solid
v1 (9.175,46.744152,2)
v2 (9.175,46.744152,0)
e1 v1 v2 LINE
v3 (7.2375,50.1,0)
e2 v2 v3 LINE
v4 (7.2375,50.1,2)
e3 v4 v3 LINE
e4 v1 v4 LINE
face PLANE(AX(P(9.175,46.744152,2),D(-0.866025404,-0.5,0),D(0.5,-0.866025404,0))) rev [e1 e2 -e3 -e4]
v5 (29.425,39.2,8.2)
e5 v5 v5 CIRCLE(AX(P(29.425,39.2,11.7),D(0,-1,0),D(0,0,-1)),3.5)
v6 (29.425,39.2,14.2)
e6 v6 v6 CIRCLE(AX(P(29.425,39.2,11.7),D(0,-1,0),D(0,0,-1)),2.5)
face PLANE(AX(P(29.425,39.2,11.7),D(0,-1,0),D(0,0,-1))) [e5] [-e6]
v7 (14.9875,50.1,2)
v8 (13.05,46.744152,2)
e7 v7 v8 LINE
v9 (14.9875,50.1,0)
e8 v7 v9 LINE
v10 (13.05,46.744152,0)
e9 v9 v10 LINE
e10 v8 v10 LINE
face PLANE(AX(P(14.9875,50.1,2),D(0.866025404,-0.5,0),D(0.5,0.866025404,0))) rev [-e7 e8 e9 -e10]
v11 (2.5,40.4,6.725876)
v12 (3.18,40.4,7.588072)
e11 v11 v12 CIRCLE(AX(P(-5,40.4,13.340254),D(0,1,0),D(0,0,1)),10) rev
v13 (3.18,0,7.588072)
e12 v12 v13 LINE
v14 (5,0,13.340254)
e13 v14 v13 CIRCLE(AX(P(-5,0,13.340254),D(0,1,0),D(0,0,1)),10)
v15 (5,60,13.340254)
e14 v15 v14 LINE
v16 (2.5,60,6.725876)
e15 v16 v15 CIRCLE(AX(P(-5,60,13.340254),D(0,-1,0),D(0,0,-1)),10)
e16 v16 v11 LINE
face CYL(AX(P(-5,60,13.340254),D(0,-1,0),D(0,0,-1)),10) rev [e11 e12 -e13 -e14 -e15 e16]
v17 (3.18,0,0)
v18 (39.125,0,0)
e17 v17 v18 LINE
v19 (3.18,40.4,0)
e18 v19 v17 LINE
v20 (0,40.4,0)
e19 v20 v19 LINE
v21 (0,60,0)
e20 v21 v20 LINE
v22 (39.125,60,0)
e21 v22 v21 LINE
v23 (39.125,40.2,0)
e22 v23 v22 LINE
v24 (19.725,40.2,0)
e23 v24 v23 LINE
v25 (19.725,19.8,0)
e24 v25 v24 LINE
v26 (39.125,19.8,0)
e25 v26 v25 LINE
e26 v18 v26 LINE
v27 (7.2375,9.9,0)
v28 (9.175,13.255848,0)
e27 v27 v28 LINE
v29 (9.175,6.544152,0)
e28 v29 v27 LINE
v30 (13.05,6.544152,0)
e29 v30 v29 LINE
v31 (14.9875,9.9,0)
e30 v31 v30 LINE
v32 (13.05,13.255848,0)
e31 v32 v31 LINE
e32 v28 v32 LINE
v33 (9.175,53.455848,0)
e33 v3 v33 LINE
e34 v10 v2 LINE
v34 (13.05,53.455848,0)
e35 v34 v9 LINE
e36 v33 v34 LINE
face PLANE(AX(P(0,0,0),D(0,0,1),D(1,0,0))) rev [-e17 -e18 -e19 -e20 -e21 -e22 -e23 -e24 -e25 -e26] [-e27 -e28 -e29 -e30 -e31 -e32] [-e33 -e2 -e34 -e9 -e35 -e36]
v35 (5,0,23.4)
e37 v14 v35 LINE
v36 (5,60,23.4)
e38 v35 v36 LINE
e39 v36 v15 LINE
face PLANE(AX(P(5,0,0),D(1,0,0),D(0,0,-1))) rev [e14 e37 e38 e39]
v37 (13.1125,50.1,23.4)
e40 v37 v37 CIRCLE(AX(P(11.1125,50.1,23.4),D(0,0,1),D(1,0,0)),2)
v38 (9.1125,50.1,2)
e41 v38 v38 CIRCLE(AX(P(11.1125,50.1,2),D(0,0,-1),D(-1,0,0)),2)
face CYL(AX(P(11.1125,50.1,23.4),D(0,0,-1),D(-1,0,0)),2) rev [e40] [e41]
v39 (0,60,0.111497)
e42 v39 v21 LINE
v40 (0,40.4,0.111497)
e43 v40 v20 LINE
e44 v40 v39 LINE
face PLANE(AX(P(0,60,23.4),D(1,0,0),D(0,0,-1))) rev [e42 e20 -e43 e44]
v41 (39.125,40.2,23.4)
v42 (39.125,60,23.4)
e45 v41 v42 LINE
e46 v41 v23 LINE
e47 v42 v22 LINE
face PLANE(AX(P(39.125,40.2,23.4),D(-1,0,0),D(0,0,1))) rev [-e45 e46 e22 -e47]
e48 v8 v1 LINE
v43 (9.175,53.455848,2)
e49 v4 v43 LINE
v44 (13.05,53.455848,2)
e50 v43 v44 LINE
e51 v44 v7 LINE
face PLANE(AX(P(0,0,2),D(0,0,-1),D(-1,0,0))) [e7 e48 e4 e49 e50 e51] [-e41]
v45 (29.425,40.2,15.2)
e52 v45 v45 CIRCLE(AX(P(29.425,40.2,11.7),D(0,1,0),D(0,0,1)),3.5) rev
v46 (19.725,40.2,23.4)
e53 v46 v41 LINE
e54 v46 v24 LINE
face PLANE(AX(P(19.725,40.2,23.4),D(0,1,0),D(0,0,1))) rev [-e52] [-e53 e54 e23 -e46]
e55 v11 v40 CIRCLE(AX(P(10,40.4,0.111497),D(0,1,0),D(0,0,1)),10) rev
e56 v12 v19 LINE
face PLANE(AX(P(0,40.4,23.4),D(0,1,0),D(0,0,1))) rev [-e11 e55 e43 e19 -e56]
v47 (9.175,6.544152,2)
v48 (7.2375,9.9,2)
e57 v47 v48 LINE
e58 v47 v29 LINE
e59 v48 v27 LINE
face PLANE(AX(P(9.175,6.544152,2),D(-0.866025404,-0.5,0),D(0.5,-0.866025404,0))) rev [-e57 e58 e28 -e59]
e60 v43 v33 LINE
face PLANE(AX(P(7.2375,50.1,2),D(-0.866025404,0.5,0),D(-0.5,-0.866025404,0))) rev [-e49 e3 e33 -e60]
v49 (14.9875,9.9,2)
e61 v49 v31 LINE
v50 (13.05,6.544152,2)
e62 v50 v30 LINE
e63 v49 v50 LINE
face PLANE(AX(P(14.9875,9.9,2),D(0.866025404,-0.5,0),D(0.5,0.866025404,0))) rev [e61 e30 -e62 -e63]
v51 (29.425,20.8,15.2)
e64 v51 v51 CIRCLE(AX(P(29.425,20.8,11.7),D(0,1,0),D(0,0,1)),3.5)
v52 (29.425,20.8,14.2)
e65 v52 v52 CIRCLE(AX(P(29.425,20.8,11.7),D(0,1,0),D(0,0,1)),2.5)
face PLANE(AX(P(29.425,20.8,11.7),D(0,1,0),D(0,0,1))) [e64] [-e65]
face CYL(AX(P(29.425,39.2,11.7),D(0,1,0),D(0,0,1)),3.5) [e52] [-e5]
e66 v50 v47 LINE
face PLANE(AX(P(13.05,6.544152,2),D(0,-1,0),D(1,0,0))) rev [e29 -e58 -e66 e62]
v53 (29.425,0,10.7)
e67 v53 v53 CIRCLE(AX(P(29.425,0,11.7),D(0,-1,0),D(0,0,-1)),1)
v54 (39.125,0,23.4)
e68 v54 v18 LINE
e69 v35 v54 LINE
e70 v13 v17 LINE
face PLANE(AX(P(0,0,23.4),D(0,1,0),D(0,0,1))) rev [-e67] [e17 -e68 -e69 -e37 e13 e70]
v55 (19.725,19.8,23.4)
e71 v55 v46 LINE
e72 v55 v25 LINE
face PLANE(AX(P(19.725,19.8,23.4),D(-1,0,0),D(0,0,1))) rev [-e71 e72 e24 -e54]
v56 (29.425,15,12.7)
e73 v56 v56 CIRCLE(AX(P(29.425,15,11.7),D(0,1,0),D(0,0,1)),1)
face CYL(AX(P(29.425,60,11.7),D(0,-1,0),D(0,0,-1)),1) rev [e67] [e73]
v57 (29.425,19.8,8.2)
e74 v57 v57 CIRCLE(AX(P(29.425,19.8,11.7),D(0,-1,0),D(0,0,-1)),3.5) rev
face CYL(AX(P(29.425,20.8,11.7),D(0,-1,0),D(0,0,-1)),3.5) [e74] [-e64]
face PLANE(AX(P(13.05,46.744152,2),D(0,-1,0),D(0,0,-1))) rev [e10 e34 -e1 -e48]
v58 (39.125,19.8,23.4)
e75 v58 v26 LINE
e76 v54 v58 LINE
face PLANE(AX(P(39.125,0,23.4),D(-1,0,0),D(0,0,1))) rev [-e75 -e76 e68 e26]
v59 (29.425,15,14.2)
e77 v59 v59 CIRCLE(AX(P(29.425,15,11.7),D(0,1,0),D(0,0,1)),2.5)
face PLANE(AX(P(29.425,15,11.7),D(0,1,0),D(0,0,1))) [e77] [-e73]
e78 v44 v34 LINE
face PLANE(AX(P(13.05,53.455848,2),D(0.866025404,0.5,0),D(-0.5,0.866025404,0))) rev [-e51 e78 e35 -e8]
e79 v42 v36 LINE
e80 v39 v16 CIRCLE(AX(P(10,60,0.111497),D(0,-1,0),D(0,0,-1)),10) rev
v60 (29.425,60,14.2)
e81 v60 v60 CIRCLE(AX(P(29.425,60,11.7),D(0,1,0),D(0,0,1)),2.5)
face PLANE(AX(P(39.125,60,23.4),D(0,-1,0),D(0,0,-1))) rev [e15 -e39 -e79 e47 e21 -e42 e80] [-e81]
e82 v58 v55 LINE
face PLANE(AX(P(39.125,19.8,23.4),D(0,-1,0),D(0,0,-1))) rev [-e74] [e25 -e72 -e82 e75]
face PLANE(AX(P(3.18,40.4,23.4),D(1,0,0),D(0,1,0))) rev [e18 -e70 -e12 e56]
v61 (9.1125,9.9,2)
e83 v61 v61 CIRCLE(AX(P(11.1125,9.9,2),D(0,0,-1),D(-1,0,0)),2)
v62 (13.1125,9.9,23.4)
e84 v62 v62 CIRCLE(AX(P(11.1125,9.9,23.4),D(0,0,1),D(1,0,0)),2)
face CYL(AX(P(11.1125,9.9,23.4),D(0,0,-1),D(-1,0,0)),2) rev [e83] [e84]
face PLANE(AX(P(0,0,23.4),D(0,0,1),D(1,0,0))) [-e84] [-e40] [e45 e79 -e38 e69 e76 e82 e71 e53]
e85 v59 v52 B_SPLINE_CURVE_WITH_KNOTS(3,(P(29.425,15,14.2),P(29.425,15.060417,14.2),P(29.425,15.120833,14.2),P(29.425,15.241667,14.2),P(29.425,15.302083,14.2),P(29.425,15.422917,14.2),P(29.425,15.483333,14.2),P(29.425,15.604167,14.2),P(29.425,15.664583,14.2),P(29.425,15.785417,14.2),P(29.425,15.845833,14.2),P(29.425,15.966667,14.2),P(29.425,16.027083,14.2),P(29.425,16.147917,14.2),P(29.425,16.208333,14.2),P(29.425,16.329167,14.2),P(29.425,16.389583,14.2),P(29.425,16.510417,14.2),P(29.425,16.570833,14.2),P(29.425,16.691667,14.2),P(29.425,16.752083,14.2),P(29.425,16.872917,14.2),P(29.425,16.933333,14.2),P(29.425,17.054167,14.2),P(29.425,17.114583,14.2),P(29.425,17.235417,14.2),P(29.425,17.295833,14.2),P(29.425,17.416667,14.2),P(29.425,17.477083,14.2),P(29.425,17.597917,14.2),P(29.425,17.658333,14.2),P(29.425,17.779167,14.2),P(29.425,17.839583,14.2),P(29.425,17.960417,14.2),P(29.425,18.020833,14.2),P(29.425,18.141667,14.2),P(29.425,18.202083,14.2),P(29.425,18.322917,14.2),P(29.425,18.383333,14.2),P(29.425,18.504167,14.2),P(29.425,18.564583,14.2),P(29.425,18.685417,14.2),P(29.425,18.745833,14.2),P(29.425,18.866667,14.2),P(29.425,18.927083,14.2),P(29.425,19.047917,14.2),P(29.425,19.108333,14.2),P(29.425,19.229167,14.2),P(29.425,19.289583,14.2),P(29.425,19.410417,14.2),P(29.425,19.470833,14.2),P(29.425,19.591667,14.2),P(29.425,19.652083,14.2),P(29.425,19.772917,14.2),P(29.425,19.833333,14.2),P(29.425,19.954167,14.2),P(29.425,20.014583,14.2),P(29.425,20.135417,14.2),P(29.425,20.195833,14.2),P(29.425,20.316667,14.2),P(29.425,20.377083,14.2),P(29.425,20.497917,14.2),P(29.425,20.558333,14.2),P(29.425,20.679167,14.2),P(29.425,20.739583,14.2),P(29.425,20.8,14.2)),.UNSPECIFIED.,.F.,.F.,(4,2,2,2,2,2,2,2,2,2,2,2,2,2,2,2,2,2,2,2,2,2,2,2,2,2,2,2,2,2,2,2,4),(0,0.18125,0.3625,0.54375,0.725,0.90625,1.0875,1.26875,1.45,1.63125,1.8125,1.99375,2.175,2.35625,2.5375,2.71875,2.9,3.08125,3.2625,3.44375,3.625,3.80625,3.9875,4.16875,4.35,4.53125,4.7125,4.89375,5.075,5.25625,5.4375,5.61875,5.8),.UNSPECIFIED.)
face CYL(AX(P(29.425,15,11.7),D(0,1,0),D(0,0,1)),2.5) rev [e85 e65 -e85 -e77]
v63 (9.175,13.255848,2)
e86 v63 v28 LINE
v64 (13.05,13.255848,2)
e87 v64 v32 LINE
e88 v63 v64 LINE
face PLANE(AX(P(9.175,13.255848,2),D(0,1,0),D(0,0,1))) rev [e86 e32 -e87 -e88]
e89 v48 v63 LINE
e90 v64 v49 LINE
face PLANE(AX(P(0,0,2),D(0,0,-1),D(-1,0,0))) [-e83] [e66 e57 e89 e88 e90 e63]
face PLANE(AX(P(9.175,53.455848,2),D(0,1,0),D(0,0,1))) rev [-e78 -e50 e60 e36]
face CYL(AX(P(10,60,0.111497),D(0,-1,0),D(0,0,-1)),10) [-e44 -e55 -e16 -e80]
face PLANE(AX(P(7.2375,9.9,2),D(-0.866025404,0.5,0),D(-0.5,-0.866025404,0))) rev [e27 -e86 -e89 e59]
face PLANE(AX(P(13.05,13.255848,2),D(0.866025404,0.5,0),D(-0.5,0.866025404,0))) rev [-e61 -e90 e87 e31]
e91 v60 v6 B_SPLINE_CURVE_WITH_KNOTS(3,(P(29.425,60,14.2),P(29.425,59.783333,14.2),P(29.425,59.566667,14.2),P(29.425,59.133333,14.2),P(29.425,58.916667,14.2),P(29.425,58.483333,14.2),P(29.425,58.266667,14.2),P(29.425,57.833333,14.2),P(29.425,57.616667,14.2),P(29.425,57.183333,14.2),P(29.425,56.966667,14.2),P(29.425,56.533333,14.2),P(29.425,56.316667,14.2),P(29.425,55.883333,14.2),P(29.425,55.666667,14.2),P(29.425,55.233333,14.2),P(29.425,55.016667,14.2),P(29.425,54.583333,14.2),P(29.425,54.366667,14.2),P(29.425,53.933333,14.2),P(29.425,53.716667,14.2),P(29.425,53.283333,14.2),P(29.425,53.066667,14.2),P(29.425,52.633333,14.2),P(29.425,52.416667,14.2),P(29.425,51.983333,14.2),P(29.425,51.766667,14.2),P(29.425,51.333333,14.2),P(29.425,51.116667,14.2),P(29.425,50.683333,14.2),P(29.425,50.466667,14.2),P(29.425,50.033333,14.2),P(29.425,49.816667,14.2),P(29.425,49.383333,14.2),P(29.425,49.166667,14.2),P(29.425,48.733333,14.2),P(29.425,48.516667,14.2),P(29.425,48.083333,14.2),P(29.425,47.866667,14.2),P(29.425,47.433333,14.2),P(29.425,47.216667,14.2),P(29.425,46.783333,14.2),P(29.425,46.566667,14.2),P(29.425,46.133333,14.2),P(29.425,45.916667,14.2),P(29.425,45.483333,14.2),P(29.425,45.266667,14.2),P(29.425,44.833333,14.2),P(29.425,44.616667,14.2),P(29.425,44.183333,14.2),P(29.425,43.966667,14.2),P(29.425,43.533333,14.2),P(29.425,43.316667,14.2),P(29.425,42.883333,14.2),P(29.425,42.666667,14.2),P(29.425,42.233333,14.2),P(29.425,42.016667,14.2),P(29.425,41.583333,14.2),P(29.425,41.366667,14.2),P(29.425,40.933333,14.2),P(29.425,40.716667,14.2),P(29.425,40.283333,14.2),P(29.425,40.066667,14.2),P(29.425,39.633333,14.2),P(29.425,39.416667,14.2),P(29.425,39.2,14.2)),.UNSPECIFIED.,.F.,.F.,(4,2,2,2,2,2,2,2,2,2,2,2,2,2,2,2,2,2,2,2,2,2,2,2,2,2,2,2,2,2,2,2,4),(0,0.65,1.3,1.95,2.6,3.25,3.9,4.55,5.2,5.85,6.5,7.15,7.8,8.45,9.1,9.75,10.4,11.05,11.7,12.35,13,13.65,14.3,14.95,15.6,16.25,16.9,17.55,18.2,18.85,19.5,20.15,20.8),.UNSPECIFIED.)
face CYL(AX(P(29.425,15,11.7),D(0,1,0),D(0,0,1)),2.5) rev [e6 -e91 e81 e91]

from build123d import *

# Parameters (mm, degrees)
MAINBLOCK_R                     = 2
MAINBLOCKBOSS_EXTRUDE1_DEPTH    = 23.4
TOPHOLECUT_SKETCH2_R            = 2.5
TOPHOLECUT_EXTRUDE1_DEPTH       = 45
TOPSPACERSKETCH4_R              = 3.5
TOPSPACERSKETCH4_R_2            = 2.5
TOPSPACERBOSS_EXTRUDE2_DEPTH    = 1
LOWERSPACERBOSS_EXTRUDE3_START  = 1
LOWERSPACERSKETCH5_R            = 3.5
LOWERSPACERSKETCH5_R_2          = 2.5
LOWERSPACERBOSS_EXTRUDE3_DEPTH  = 1
MOUNTHOLEBORECUT_EXTRUDE1_DEPTH = 2
PUSHPINHOLESKETCH1_R            = 1
PUSHPINHOLECUT_EXTRUDE1_DEPTH   = 76.354665582
SCREWCOLLISIONSKETCH1_W         = 18.72
SCREWCOLLISIONSKETCH1_H         = 60
CUT_EXTRUDE1_DEPTH              = 5
FILLET1_R                       = 10
FILLET2_R                       = 10
MIDRAILINSETSKETCH1_W           = 3.18
MIDRAILINSETSKETCH1_H           = 40.4
MIDRAILINSETCUT_EXTRUDE2_DEPTH  = 76.354665582


with BuildPart() as part:
    # MainBlock → MainBlockBoss-Extrude1 (new body)
    with BuildSketch(Plane.XY):
        Polygon((0, 0), (39.125, 0), (39.125, 19.8), (19.725, 19.8), (19.725, 40.2), (39.125, 40.2), (39.125, 60), (0, 60), align=None)
        with Locations((11.1125, 50.1)):
            Circle(MAINBLOCK_R, mode=Mode.SUBTRACT)
        with Locations((11.1125, 9.9)):
            Circle(MAINBLOCK_R, mode=Mode.SUBTRACT)
    extrude(amount=MAINBLOCKBOSS_EXTRUDE1_DEPTH)

    # TopHoleCut-Sketch2 → TopHoleCut-Extrude1 (cut)
    with BuildSketch(Plane(origin=(0, 60, 0), x_dir=(1, 0, 0), z_dir=(0, 1, 0))):
        with Locations(Location((29.425, -11.7, 0), (0, 0, 270))):
            Circle(TOPHOLECUT_SKETCH2_R)
    extrude(amount=-TOPHOLECUT_EXTRUDE1_DEPTH, mode=Mode.SUBTRACT)

    # TopSpacerSketch4 → TopSpacerBoss-Extrude2 (add)
    with BuildSketch(Plane.XZ.offset(-40.2)):
        with Locations(Location((29.425, 11.7, 0), (0, 0, 90))):
            Circle(TOPSPACERSKETCH4_R)
        with Locations(Location((29.425, 11.7, 0), (0, 0, 90))):
            Circle(TOPSPACERSKETCH4_R_2, mode=Mode.SUBTRACT)
    extrude(amount=TOPSPACERBOSS_EXTRUDE2_DEPTH)

    # LowerSpacerSketch5 → LowerSpacerBoss-Extrude3 (add)
    with BuildSketch(Plane(origin=(0, 19.8, 0), x_dir=(1, 0, 0), z_dir=(0, 1, 0)).offset(LOWERSPACERBOSS_EXTRUDE3_START)):
        with Locations(Location((29.425, -11.7, 0), (0, 0, 270))):
            Circle(LOWERSPACERSKETCH5_R)
        with Locations(Location((29.425, -11.7, 0), (0, 0, 270))):
            Circle(LOWERSPACERSKETCH5_R_2, mode=Mode.SUBTRACT)
    extrude(amount=-LOWERSPACERBOSS_EXTRUDE3_DEPTH)

    # MountHoleBoreSketch1 → MountHoleBoreCut-Extrude1 (cut)
    with BuildSketch(Plane(origin=(0, 0, 0), x_dir=(-1, 0, 0), z_dir=(0, 0, -1))):
        Polygon((-7.2375, 50.1), (-9.175, 53.45584844), (-13.05, 53.45584844), (-14.9875, 50.1), (-13.05, 46.74415156), (-9.175, 46.74415156), align=None)
        Polygon((-7.2375, 9.9), (-9.175, 13.25584844), (-13.05, 13.25584844), (-14.9875, 9.9), (-13.05, 6.54415156), (-9.175, 6.54415156), align=None)
    extrude(amount=-MOUNTHOLEBORECUT_EXTRUDE1_DEPTH, mode=Mode.SUBTRACT)

    # PushPinHoleSketch1 → PushPinHoleCut-Extrude1 (cut, through all)
    with BuildSketch(Plane.XZ):
        with Locations(Location((29.425, 11.7, 0), (0, 0, 270))):
            Circle(PUSHPINHOLESKETCH1_R)
    extrude(amount=-PUSHPINHOLECUT_EXTRUDE1_DEPTH, mode=Mode.SUBTRACT)

    # ScrewCollisionSketch1 → Cut-Extrude1 (cut)
    with BuildSketch(Plane.ZY):
        with Locations((14.04, 30)):
            Rectangle(SCREWCOLLISIONSKETCH1_W, SCREWCOLLISIONSKETCH1_H)
    extrude(amount=-CUT_EXTRUDE1_DEPTH, mode=Mode.SUBTRACT)

    # Fillet1
    # the kernel refuses this fillet: 10 mm, written as the material it adds along each edge
    with BuildSketch(Plane(origin=(5, 60, 4.68), x_dir=(0, 0, 1), z_dir=(0, -1, 0))) as fillet1_piece_1:
        with BuildLine():
            CenterArc((8.660254038, 10), FILLET1_R, 210, 60)
            Line((0, 5), (-0.173205081, 4.9))
            ThreePointArc((-0.173205081, 4.9), (-0.2, 2.5), (-0.2, 0))
            Line((-0.2, 0), (0, -0.2))
            Line((0, -0.2), (8.660254038, -0.2))
            Line((8.660254038, -0.2), (8.660254038, 0))
        make_face()
    extrude(amount=60)

    # Fillet2
    fillet2_edges = [part.edges().sort_by_distance(p)[0] for p in [
        (0, 30, 4.68),
    ]]
    fillet(fillet2_edges, radius=FILLET2_R)

    # MidRailInsetSketch1 → MidRailInsetCut-Extrude2 (cut, through all)
    with BuildSketch(Plane(origin=(0, 0, 0), x_dir=(-1, 0, 0), z_dir=(0, 0, -1))):
        with Locations((-1.59, 20.2)):
            Rectangle(MIDRAILINSETSKETCH1_W, MIDRAILINSETSKETCH1_H)
    extrude(amount=-MIDRAILINSETCUT_EXTRUDE2_DEPTH, mode=Mode.SUBTRACT)


solid = part.part
